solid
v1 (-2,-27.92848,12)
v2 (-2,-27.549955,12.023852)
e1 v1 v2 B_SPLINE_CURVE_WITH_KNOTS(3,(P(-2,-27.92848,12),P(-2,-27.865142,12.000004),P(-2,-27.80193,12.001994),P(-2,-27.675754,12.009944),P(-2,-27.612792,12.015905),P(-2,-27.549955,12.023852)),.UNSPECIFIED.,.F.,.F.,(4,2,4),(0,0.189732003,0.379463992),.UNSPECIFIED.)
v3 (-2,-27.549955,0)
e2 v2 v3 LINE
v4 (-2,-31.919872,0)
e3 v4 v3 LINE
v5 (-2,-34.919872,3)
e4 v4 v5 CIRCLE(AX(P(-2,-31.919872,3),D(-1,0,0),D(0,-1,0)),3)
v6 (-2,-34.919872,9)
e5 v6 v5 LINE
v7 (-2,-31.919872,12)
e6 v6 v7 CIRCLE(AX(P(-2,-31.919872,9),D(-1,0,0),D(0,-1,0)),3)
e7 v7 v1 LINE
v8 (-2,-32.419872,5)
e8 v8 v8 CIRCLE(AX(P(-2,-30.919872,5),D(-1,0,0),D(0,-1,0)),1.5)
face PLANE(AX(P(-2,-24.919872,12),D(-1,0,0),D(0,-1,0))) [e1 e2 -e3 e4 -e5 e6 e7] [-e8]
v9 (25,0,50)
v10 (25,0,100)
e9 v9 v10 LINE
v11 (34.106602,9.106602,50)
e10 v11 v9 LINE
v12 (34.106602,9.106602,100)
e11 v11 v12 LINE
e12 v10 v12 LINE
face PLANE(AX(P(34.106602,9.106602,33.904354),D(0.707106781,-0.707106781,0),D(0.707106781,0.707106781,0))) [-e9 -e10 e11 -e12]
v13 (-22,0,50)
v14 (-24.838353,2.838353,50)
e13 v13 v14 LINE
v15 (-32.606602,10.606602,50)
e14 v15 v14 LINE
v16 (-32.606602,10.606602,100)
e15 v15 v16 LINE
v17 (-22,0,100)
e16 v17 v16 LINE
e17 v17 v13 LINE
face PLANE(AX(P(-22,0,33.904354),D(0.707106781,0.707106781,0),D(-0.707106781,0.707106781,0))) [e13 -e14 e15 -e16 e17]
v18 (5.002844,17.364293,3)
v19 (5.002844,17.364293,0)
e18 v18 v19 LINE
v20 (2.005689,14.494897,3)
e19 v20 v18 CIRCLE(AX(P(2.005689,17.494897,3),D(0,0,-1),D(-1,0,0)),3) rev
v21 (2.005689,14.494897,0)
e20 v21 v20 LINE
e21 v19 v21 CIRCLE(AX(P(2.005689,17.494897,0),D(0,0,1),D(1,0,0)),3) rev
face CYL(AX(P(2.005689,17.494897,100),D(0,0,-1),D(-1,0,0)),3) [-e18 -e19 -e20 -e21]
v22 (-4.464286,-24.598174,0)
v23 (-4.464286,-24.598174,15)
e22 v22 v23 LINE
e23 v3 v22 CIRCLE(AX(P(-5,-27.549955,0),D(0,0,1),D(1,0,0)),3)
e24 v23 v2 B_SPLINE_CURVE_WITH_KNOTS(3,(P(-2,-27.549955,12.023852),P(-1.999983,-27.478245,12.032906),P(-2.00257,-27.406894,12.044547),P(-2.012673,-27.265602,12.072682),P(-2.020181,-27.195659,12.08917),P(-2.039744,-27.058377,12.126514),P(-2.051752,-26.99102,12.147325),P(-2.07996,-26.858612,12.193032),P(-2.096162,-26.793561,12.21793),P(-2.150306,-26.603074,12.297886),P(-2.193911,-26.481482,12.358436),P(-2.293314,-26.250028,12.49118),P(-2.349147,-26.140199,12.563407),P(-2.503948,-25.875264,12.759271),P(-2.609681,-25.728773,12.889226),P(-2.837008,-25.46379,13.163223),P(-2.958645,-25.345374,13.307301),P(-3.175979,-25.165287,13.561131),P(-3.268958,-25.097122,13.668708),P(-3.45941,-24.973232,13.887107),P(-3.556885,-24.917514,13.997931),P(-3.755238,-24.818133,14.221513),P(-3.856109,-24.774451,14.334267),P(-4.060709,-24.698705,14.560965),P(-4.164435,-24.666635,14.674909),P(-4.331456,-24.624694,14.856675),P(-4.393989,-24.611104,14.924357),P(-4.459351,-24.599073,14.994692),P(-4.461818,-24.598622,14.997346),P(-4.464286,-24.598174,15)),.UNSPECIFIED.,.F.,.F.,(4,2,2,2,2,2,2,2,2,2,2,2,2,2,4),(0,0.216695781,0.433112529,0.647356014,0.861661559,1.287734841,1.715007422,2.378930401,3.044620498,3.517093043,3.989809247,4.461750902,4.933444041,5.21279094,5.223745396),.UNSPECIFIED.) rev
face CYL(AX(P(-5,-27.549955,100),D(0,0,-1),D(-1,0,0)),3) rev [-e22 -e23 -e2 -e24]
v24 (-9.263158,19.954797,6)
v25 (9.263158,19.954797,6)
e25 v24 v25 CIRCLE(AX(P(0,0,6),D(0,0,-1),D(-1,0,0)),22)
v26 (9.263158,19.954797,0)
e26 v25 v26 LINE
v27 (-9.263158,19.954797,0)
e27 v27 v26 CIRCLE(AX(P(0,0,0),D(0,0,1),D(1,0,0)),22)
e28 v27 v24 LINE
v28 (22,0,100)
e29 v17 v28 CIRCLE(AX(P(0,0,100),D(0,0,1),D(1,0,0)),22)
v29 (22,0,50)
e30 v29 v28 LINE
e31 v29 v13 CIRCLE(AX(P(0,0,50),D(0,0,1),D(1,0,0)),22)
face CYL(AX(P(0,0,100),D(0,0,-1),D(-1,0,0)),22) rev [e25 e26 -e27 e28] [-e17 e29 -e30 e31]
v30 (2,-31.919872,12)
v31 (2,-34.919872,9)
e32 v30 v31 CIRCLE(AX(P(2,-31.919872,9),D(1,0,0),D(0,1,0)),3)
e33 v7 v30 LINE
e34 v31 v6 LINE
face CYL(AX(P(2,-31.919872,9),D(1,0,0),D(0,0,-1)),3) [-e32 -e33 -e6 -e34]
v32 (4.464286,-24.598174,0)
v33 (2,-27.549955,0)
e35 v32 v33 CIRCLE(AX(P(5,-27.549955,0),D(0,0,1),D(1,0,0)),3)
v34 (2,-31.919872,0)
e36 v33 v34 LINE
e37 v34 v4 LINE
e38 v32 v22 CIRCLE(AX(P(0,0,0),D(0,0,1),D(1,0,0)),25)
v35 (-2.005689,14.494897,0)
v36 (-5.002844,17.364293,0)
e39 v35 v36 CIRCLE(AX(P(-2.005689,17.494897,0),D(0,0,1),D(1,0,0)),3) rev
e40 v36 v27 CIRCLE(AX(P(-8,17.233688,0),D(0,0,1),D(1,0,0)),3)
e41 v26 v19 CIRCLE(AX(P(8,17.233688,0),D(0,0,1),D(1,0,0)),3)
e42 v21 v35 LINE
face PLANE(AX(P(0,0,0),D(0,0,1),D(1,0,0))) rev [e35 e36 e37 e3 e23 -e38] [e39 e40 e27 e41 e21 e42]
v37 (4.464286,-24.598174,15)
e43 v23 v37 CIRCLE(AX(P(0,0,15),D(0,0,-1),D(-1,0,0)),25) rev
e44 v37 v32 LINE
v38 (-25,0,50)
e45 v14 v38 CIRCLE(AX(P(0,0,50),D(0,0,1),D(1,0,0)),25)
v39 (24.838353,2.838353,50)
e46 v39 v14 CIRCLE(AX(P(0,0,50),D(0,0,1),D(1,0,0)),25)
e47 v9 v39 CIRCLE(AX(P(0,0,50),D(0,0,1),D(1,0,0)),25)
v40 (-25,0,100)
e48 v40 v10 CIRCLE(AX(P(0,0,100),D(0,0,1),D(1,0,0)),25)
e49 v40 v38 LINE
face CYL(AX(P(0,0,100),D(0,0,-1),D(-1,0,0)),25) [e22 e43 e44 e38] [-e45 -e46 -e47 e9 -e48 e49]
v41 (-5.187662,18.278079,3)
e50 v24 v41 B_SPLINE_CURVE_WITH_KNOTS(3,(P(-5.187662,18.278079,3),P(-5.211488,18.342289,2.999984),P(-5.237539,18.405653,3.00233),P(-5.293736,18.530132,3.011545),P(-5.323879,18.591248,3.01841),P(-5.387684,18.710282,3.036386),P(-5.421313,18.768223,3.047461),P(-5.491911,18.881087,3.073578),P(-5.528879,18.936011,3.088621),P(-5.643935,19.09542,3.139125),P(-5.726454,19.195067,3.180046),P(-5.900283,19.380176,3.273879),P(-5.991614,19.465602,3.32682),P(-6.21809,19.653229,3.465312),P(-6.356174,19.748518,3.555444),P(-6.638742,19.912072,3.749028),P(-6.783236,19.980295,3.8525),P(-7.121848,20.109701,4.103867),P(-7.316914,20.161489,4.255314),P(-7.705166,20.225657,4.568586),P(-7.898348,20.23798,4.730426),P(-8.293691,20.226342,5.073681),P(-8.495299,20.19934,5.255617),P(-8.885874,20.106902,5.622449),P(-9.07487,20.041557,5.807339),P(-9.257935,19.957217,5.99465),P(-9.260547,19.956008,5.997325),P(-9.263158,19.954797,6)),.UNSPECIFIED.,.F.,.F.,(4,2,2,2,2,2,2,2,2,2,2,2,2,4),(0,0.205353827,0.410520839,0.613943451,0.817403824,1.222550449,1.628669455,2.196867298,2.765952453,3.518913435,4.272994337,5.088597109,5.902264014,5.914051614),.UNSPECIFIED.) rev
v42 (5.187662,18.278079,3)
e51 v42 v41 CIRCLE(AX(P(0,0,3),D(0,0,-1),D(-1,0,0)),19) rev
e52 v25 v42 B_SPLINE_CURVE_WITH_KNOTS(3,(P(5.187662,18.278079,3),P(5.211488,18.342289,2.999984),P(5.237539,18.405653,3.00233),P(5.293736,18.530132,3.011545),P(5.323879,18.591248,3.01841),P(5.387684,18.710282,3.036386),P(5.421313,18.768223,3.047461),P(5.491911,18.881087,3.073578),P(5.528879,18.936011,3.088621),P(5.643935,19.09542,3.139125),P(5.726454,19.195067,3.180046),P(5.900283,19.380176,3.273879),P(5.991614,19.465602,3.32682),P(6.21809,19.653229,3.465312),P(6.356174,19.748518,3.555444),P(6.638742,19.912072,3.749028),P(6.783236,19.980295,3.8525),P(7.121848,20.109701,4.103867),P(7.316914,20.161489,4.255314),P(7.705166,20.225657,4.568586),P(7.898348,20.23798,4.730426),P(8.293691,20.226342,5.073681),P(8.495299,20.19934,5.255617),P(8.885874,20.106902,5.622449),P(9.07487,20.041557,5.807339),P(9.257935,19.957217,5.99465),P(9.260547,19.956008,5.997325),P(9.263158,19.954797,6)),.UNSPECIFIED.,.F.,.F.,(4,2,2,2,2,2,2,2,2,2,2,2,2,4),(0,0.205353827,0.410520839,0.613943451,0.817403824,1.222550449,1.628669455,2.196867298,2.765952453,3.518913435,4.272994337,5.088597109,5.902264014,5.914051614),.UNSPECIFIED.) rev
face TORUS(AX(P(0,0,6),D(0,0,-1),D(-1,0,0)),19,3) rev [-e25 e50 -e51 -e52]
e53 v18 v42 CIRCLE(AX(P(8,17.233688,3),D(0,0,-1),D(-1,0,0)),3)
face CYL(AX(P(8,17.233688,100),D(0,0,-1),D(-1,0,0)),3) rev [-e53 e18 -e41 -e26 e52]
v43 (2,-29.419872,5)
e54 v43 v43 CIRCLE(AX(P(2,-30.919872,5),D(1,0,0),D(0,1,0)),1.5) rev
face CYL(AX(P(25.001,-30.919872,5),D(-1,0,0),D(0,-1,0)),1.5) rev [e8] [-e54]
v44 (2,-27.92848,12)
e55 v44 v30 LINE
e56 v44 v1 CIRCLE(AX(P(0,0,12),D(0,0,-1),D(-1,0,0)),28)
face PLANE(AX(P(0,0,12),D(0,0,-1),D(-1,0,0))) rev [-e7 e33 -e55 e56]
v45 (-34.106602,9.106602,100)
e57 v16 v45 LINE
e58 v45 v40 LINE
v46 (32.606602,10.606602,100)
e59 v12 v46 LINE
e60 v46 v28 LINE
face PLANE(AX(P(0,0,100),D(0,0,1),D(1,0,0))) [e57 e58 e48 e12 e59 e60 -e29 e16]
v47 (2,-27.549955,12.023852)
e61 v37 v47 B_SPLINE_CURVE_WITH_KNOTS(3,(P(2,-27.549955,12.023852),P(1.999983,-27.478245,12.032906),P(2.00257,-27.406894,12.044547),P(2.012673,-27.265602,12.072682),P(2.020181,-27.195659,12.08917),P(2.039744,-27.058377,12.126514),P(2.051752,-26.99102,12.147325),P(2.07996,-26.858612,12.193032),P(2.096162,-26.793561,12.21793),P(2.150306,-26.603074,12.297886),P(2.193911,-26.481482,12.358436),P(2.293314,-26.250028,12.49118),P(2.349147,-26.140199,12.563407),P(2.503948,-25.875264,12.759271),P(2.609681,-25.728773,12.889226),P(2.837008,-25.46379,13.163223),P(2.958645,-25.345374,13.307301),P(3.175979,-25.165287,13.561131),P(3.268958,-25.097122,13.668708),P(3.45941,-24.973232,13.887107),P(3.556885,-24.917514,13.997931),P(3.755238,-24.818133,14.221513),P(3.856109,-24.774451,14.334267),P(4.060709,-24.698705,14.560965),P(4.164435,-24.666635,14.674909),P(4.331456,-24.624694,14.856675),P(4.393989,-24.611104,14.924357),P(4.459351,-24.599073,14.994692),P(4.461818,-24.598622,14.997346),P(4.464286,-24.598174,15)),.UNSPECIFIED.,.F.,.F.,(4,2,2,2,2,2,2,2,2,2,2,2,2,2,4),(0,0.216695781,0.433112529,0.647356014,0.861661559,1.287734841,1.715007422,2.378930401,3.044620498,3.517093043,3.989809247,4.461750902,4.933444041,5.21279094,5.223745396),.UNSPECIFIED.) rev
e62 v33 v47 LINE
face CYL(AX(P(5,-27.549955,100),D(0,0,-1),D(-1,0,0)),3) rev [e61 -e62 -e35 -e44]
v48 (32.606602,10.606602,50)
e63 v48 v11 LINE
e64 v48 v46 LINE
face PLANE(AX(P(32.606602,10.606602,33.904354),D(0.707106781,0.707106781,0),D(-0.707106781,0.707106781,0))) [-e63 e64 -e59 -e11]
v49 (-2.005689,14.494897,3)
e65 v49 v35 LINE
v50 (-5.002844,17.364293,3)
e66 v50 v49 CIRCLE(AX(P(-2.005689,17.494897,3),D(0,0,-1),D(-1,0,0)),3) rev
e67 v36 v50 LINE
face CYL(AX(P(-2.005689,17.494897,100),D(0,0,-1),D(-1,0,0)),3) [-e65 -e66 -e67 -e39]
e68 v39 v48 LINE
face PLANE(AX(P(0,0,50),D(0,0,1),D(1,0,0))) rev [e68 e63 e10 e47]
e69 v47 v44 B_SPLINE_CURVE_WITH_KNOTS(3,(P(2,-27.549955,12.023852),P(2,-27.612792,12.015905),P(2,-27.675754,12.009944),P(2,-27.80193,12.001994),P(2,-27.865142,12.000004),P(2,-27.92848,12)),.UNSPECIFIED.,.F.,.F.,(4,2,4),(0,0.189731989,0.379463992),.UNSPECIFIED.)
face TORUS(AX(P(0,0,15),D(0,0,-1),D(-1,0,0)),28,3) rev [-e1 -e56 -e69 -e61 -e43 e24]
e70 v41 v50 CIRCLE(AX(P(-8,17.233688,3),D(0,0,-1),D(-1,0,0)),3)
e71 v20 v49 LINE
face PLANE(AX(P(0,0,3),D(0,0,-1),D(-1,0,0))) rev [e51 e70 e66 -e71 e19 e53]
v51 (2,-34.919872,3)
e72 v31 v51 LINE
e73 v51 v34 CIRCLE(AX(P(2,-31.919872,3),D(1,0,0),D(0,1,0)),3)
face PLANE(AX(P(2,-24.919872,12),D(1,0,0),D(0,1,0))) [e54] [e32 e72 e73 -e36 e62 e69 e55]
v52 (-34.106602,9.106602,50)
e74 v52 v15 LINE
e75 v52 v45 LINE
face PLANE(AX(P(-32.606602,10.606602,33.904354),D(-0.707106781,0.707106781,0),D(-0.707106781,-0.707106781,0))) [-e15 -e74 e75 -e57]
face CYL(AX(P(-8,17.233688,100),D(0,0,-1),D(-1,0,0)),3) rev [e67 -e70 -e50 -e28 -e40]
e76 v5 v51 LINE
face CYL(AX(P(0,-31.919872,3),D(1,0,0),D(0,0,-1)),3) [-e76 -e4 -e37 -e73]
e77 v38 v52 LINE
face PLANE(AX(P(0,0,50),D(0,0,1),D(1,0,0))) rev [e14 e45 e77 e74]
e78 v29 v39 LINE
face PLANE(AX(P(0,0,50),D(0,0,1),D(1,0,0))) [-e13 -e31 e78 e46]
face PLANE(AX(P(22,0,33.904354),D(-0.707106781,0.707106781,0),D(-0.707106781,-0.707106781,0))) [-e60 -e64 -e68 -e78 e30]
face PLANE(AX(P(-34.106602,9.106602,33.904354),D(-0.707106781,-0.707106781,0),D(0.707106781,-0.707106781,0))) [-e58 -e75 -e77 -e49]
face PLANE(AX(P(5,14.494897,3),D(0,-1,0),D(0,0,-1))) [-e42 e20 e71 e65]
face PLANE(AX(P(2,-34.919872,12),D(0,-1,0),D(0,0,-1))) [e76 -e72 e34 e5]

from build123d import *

# Parameters (mm, degrees)
SKETCH1_R           = 25
SKETCH1_R_2         = 22
BOSS_EXTRUDE1_DEPTH = 100
SKETCH2_W           = 10
SKETCH2_H           = 10
BOSS_EXTRUDE3_DEPTH = 3
FILLET2_R           = 3
FILLET3_R           = 3
SKETCH3_W           = 4
SKETCH3_H           = 10
BOSS_EXTRUDE4_DEPTH = 12
CUT_EXTRUDE1_REACH  = 111.309
SKETCH4_R           = 1.5
FILLET4_R           = 3
SKETCH5_W           = 63.273881994
SKETCH5_H           = 26.217893921
CUT_EXTRUDE2_DEPTH  = 50
BOSS_EXTRUDE5_DEPTH = 50


with BuildPart() as part:
    # Sketch1 → Boss-Extrude1 (new body)
    with BuildSketch(Plane.XY):
        Circle(SKETCH1_R)
        Circle(SKETCH1_R_2, mode=Mode.SUBTRACT)
    extrude(amount=BOSS_EXTRUDE1_DEPTH)

    # Sketch2 → Boss-Extrude3 (add)
    with BuildSketch(Plane(origin=(0, 0, 0), x_dir=(-1, 0, 0), z_dir=(0, 0, -1))):
        with Locations((0, 19.494897428)):
            Rectangle(SKETCH2_W, SKETCH2_H)
    extrude(amount=-BOSS_EXTRUDE3_DEPTH)

    # Fillet2
    # the kernel refuses this fillet: 3 mm, written as the material it adds along each edge
    with BuildSketch(Plane(origin=(0, 0, 3), x_dir=(-0.5397978604012739, 0.8417946720585768, 0), z_dir=(-0.8417946720585768, -0.5397978604012739, 0))) as fillet2_piece_1_section:
        with BuildLine():
            CenterArc((22 - FILLET2_R, -FILLET2_R), FILLET2_R, 0, 90)
            Line((22 - FILLET2_R, 0), (22, 0))
            Line((22, 0), (22, -FILLET2_R))
        make_face()
    fillet2_piece_1 = revolve(axis=Axis((0, 0, 3), (0, 0, -1)), revolution_arc=65.339758778, mode=Mode.PRIVATE)
    fillet2_piece_1 = split(fillet2_piece_1, bisect_by=Plane(origin=(5, 21.121644808, 3.678956026), z_dir=(-1, 0, 0)), keep=Keep.TOP, mode=Mode.PRIVATE)
    fillet2_piece_1 = split(fillet2_piece_1, bisect_by=Plane(origin=(-5, 21.121644808, 3.678956026), z_dir=(1, 0, 0)), keep=Keep.TOP, mode=Mode.PRIVATE)
    add(fillet2_piece_1)
    with BuildSketch(Plane(origin=(5, 21.424285286, 3), x_dir=(0.9454116384931546, -0.32587855683013084, 0), z_dir=(0, 0, -1))) as fillet2_piece_2:
        with BuildLine():
            CenterArc((4.201860731, 2.984203833), FILLET2_R, 160.981189421, 114.90106237)
            Line((1.365625815, 3.961839503), (0, 0))
            ThreePointArc((0, 0), (2.254656978, -0.11583856), (4.509313955, 0))
        make_face()
    extrude(amount=3)
    with BuildSketch(Plane(origin=(-5, 21.424285286, 3), x_dir=(-0.9454116384931545, -0.325878556830131, 0), z_dir=(0, 0, -1))) as fillet2_piece_3:
        with BuildLine():
            CenterArc((4.201860731, -2.984203833), FILLET2_R, 84.117748208, 114.90106237)
            Line((1.365625815, -3.961839503), (0, 0))
            ThreePointArc((0, 0), (2.254656978, 0.11583856), (4.509313955, 0))
        make_face()
    extrude(amount=3)
    with BuildSketch(Plane(origin=(0, 0, 3), x_dir=(-0.5397978604012739, 0.8417946720585768, 0), z_dir=(-0.8417946720585768, -0.5397978604012739, 0))) as fillet2_piece_4a_section:
        with BuildLine():
            CenterArc((22 - FILLET2_R, -FILLET2_R), FILLET2_R, 0, 90)
            Line((22 - FILLET2_R, 0), (22, 0))
            Line((22, 0), (22, -FILLET2_R))
        make_face()
    fillet2_piece_4a = revolve(axis=Axis((0, 0, 3), (0, 0, -1)), revolution_arc=65.339758778, mode=Mode.PRIVATE)
    fillet2_piece_4a = split(fillet2_piece_4a, bisect_by=Plane(origin=(-5, 19.550370475, 3.699165733), z_dir=(-1, 0, 0)), keep=Keep.TOP, mode=Mode.PRIVATE)
    with BuildSketch(Plane(origin=(-5, 21.424285286, 14.273284888), x_dir=(-0.9454116384931546, -0.3258785568301304, 0), z_dir=(0, 0, -1))) as fillet2_piece_4b_section:
        with BuildLine():
            CenterArc((4.201860731, -2.984203833), FILLET2_R, 84.117748208, 114.90106237)
            Line((1.365625815, -3.961839503), (0, 0))
            ThreePointArc((0, 0), (2.254656978, 0.11583856), (4.509313955, 0))
        make_face()
    fillet2_piece_4b = extrude(amount=14.273284888, mode=Mode.PRIVATE)
    fillet2_piece_4b = split(fillet2_piece_4b, bisect_by=Plane(origin=(-6.027024326, 20.156097629, 3), z_dir=(0, 0, 1)), keep=Keep.TOP, mode=Mode.PRIVATE)
    fillet2_piece_4 = fillet2_piece_4a & fillet2_piece_4b
    add(fillet2_piece_4)
    with BuildSketch(Plane(origin=(5, 21.424285286, 14.273284888), x_dir=(0.9454116384931546, -0.32587855683013073, 0), z_dir=(0, 0, -1))) as fillet2_piece_5a_section:
        with BuildLine():
            CenterArc((4.201860731, 2.984203833), FILLET2_R, 160.981189421, 114.90106237)
            Line((1.365625815, 3.961839503), (0, 0))
            ThreePointArc((0, 0), (2.254656978, -0.11583856), (4.509313955, 0))
        make_face()
    fillet2_piece_5a = extrude(amount=14.273284888, mode=Mode.PRIVATE)
    fillet2_piece_5a = split(fillet2_piece_5a, bisect_by=Plane(origin=(6.027024326, 20.156097629, 3), z_dir=(0, 0, 1)), keep=Keep.TOP, mode=Mode.PRIVATE)
    with BuildSketch(Plane(origin=(0, 0, 3), x_dir=(-0.5397978604012739, 0.8417946720585768, 0), z_dir=(-0.8417946720585768, -0.5397978604012739, 0))) as fillet2_piece_5b_section:
        with BuildLine():
            CenterArc((22 - FILLET2_R, -FILLET2_R), FILLET2_R, 0, 90)
            Line((22 - FILLET2_R, 0), (22, 0))
            Line((22, 0), (22, -FILLET2_R))
        make_face()
    fillet2_piece_5b = revolve(axis=Axis((0, 0, 3), (0, 0, -1)), revolution_arc=65.339758778, mode=Mode.PRIVATE)
    fillet2_piece_5b = split(fillet2_piece_5b, bisect_by=Plane(origin=(5, 19.550370668, 3.699165846), z_dir=(1, 0, 0)), keep=Keep.TOP, mode=Mode.PRIVATE)
    fillet2_piece_5 = fillet2_piece_5a & fillet2_piece_5b
    add(fillet2_piece_5)

    # Fillet3
    fillet3_edges = [part.edges().sort_by_distance(p)[0] for p in [
        (-5, 14.494897428, 1.5),
        (5, 14.494897428, 1.5),
    ]]
    fillet(fillet3_edges, radius=FILLET3_R)

    # Sketch3 → Boss-Extrude4 (add)
    with BuildSketch(Plane(origin=(0, 0, 0), x_dir=(-1, 0, 0), z_dir=(0, 0, -1))):
        with Locations((0, -29.919871589)):
            Rectangle(SKETCH3_W, SKETCH3_H)
    extrude(amount=-BOSS_EXTRUDE4_DEPTH)

    # Sketch4 → Cut-Extrude1 (cut, up to next)
    with BuildSketch(Plane.ZY.offset(2), mode=Mode.PRIVATE) as cut_extrude1_sk1:
        with Locations(Location((5, -30.919871589, 0), (0, 0, 270))):
            Circle(SKETCH4_R)
    cut_extrude1_tool1 = extrude(cut_extrude1_sk1.sketch, amount=-CUT_EXTRUDE1_REACH, mode=Mode.PRIVATE) & part.part
    add(cut_extrude1_tool1.solids().sort_by_distance((-2, -30.919872, 5))[0], mode=Mode.SUBTRACT)

    # Fillet4
    fillet4_edges = [part.edges().sort_by_distance(p)[0] for p in [
        (0, -25, 12),
        (-2, -24.919871589, 6),
        (0, -34.919871589, 12),
        (2, -24.919871589, 6),
        (0, -34.919871589, 0),
    ]]
    fillet(fillet4_edges, radius=FILLET4_R)

    # Sketch5 → Cut-Extrude2 (cut)
    with BuildSketch(Plane.XY.offset(100)):
        with Locations((0, 13.108946961)):
            Rectangle(SKETCH5_W, SKETCH5_H)
    extrude(amount=-CUT_EXTRUDE2_DEPTH, mode=Mode.SUBTRACT)

    # Sketch8 → Boss-Extrude5 (add)
    with BuildSketch(Plane.XY.offset(100)):
        Polygon((25, 0), (22, 0), (32.606601718, 10.606601718), (34.106601718, 9.106601718), align=None)
        Polygon((-25, 0), (-22, 0), (-32.606601718, 10.606601718), (-34.106601718, 9.106601718), align=None)
    extrude(amount=-BOSS_EXTRUDE5_DEPTH)


solid = part.part
